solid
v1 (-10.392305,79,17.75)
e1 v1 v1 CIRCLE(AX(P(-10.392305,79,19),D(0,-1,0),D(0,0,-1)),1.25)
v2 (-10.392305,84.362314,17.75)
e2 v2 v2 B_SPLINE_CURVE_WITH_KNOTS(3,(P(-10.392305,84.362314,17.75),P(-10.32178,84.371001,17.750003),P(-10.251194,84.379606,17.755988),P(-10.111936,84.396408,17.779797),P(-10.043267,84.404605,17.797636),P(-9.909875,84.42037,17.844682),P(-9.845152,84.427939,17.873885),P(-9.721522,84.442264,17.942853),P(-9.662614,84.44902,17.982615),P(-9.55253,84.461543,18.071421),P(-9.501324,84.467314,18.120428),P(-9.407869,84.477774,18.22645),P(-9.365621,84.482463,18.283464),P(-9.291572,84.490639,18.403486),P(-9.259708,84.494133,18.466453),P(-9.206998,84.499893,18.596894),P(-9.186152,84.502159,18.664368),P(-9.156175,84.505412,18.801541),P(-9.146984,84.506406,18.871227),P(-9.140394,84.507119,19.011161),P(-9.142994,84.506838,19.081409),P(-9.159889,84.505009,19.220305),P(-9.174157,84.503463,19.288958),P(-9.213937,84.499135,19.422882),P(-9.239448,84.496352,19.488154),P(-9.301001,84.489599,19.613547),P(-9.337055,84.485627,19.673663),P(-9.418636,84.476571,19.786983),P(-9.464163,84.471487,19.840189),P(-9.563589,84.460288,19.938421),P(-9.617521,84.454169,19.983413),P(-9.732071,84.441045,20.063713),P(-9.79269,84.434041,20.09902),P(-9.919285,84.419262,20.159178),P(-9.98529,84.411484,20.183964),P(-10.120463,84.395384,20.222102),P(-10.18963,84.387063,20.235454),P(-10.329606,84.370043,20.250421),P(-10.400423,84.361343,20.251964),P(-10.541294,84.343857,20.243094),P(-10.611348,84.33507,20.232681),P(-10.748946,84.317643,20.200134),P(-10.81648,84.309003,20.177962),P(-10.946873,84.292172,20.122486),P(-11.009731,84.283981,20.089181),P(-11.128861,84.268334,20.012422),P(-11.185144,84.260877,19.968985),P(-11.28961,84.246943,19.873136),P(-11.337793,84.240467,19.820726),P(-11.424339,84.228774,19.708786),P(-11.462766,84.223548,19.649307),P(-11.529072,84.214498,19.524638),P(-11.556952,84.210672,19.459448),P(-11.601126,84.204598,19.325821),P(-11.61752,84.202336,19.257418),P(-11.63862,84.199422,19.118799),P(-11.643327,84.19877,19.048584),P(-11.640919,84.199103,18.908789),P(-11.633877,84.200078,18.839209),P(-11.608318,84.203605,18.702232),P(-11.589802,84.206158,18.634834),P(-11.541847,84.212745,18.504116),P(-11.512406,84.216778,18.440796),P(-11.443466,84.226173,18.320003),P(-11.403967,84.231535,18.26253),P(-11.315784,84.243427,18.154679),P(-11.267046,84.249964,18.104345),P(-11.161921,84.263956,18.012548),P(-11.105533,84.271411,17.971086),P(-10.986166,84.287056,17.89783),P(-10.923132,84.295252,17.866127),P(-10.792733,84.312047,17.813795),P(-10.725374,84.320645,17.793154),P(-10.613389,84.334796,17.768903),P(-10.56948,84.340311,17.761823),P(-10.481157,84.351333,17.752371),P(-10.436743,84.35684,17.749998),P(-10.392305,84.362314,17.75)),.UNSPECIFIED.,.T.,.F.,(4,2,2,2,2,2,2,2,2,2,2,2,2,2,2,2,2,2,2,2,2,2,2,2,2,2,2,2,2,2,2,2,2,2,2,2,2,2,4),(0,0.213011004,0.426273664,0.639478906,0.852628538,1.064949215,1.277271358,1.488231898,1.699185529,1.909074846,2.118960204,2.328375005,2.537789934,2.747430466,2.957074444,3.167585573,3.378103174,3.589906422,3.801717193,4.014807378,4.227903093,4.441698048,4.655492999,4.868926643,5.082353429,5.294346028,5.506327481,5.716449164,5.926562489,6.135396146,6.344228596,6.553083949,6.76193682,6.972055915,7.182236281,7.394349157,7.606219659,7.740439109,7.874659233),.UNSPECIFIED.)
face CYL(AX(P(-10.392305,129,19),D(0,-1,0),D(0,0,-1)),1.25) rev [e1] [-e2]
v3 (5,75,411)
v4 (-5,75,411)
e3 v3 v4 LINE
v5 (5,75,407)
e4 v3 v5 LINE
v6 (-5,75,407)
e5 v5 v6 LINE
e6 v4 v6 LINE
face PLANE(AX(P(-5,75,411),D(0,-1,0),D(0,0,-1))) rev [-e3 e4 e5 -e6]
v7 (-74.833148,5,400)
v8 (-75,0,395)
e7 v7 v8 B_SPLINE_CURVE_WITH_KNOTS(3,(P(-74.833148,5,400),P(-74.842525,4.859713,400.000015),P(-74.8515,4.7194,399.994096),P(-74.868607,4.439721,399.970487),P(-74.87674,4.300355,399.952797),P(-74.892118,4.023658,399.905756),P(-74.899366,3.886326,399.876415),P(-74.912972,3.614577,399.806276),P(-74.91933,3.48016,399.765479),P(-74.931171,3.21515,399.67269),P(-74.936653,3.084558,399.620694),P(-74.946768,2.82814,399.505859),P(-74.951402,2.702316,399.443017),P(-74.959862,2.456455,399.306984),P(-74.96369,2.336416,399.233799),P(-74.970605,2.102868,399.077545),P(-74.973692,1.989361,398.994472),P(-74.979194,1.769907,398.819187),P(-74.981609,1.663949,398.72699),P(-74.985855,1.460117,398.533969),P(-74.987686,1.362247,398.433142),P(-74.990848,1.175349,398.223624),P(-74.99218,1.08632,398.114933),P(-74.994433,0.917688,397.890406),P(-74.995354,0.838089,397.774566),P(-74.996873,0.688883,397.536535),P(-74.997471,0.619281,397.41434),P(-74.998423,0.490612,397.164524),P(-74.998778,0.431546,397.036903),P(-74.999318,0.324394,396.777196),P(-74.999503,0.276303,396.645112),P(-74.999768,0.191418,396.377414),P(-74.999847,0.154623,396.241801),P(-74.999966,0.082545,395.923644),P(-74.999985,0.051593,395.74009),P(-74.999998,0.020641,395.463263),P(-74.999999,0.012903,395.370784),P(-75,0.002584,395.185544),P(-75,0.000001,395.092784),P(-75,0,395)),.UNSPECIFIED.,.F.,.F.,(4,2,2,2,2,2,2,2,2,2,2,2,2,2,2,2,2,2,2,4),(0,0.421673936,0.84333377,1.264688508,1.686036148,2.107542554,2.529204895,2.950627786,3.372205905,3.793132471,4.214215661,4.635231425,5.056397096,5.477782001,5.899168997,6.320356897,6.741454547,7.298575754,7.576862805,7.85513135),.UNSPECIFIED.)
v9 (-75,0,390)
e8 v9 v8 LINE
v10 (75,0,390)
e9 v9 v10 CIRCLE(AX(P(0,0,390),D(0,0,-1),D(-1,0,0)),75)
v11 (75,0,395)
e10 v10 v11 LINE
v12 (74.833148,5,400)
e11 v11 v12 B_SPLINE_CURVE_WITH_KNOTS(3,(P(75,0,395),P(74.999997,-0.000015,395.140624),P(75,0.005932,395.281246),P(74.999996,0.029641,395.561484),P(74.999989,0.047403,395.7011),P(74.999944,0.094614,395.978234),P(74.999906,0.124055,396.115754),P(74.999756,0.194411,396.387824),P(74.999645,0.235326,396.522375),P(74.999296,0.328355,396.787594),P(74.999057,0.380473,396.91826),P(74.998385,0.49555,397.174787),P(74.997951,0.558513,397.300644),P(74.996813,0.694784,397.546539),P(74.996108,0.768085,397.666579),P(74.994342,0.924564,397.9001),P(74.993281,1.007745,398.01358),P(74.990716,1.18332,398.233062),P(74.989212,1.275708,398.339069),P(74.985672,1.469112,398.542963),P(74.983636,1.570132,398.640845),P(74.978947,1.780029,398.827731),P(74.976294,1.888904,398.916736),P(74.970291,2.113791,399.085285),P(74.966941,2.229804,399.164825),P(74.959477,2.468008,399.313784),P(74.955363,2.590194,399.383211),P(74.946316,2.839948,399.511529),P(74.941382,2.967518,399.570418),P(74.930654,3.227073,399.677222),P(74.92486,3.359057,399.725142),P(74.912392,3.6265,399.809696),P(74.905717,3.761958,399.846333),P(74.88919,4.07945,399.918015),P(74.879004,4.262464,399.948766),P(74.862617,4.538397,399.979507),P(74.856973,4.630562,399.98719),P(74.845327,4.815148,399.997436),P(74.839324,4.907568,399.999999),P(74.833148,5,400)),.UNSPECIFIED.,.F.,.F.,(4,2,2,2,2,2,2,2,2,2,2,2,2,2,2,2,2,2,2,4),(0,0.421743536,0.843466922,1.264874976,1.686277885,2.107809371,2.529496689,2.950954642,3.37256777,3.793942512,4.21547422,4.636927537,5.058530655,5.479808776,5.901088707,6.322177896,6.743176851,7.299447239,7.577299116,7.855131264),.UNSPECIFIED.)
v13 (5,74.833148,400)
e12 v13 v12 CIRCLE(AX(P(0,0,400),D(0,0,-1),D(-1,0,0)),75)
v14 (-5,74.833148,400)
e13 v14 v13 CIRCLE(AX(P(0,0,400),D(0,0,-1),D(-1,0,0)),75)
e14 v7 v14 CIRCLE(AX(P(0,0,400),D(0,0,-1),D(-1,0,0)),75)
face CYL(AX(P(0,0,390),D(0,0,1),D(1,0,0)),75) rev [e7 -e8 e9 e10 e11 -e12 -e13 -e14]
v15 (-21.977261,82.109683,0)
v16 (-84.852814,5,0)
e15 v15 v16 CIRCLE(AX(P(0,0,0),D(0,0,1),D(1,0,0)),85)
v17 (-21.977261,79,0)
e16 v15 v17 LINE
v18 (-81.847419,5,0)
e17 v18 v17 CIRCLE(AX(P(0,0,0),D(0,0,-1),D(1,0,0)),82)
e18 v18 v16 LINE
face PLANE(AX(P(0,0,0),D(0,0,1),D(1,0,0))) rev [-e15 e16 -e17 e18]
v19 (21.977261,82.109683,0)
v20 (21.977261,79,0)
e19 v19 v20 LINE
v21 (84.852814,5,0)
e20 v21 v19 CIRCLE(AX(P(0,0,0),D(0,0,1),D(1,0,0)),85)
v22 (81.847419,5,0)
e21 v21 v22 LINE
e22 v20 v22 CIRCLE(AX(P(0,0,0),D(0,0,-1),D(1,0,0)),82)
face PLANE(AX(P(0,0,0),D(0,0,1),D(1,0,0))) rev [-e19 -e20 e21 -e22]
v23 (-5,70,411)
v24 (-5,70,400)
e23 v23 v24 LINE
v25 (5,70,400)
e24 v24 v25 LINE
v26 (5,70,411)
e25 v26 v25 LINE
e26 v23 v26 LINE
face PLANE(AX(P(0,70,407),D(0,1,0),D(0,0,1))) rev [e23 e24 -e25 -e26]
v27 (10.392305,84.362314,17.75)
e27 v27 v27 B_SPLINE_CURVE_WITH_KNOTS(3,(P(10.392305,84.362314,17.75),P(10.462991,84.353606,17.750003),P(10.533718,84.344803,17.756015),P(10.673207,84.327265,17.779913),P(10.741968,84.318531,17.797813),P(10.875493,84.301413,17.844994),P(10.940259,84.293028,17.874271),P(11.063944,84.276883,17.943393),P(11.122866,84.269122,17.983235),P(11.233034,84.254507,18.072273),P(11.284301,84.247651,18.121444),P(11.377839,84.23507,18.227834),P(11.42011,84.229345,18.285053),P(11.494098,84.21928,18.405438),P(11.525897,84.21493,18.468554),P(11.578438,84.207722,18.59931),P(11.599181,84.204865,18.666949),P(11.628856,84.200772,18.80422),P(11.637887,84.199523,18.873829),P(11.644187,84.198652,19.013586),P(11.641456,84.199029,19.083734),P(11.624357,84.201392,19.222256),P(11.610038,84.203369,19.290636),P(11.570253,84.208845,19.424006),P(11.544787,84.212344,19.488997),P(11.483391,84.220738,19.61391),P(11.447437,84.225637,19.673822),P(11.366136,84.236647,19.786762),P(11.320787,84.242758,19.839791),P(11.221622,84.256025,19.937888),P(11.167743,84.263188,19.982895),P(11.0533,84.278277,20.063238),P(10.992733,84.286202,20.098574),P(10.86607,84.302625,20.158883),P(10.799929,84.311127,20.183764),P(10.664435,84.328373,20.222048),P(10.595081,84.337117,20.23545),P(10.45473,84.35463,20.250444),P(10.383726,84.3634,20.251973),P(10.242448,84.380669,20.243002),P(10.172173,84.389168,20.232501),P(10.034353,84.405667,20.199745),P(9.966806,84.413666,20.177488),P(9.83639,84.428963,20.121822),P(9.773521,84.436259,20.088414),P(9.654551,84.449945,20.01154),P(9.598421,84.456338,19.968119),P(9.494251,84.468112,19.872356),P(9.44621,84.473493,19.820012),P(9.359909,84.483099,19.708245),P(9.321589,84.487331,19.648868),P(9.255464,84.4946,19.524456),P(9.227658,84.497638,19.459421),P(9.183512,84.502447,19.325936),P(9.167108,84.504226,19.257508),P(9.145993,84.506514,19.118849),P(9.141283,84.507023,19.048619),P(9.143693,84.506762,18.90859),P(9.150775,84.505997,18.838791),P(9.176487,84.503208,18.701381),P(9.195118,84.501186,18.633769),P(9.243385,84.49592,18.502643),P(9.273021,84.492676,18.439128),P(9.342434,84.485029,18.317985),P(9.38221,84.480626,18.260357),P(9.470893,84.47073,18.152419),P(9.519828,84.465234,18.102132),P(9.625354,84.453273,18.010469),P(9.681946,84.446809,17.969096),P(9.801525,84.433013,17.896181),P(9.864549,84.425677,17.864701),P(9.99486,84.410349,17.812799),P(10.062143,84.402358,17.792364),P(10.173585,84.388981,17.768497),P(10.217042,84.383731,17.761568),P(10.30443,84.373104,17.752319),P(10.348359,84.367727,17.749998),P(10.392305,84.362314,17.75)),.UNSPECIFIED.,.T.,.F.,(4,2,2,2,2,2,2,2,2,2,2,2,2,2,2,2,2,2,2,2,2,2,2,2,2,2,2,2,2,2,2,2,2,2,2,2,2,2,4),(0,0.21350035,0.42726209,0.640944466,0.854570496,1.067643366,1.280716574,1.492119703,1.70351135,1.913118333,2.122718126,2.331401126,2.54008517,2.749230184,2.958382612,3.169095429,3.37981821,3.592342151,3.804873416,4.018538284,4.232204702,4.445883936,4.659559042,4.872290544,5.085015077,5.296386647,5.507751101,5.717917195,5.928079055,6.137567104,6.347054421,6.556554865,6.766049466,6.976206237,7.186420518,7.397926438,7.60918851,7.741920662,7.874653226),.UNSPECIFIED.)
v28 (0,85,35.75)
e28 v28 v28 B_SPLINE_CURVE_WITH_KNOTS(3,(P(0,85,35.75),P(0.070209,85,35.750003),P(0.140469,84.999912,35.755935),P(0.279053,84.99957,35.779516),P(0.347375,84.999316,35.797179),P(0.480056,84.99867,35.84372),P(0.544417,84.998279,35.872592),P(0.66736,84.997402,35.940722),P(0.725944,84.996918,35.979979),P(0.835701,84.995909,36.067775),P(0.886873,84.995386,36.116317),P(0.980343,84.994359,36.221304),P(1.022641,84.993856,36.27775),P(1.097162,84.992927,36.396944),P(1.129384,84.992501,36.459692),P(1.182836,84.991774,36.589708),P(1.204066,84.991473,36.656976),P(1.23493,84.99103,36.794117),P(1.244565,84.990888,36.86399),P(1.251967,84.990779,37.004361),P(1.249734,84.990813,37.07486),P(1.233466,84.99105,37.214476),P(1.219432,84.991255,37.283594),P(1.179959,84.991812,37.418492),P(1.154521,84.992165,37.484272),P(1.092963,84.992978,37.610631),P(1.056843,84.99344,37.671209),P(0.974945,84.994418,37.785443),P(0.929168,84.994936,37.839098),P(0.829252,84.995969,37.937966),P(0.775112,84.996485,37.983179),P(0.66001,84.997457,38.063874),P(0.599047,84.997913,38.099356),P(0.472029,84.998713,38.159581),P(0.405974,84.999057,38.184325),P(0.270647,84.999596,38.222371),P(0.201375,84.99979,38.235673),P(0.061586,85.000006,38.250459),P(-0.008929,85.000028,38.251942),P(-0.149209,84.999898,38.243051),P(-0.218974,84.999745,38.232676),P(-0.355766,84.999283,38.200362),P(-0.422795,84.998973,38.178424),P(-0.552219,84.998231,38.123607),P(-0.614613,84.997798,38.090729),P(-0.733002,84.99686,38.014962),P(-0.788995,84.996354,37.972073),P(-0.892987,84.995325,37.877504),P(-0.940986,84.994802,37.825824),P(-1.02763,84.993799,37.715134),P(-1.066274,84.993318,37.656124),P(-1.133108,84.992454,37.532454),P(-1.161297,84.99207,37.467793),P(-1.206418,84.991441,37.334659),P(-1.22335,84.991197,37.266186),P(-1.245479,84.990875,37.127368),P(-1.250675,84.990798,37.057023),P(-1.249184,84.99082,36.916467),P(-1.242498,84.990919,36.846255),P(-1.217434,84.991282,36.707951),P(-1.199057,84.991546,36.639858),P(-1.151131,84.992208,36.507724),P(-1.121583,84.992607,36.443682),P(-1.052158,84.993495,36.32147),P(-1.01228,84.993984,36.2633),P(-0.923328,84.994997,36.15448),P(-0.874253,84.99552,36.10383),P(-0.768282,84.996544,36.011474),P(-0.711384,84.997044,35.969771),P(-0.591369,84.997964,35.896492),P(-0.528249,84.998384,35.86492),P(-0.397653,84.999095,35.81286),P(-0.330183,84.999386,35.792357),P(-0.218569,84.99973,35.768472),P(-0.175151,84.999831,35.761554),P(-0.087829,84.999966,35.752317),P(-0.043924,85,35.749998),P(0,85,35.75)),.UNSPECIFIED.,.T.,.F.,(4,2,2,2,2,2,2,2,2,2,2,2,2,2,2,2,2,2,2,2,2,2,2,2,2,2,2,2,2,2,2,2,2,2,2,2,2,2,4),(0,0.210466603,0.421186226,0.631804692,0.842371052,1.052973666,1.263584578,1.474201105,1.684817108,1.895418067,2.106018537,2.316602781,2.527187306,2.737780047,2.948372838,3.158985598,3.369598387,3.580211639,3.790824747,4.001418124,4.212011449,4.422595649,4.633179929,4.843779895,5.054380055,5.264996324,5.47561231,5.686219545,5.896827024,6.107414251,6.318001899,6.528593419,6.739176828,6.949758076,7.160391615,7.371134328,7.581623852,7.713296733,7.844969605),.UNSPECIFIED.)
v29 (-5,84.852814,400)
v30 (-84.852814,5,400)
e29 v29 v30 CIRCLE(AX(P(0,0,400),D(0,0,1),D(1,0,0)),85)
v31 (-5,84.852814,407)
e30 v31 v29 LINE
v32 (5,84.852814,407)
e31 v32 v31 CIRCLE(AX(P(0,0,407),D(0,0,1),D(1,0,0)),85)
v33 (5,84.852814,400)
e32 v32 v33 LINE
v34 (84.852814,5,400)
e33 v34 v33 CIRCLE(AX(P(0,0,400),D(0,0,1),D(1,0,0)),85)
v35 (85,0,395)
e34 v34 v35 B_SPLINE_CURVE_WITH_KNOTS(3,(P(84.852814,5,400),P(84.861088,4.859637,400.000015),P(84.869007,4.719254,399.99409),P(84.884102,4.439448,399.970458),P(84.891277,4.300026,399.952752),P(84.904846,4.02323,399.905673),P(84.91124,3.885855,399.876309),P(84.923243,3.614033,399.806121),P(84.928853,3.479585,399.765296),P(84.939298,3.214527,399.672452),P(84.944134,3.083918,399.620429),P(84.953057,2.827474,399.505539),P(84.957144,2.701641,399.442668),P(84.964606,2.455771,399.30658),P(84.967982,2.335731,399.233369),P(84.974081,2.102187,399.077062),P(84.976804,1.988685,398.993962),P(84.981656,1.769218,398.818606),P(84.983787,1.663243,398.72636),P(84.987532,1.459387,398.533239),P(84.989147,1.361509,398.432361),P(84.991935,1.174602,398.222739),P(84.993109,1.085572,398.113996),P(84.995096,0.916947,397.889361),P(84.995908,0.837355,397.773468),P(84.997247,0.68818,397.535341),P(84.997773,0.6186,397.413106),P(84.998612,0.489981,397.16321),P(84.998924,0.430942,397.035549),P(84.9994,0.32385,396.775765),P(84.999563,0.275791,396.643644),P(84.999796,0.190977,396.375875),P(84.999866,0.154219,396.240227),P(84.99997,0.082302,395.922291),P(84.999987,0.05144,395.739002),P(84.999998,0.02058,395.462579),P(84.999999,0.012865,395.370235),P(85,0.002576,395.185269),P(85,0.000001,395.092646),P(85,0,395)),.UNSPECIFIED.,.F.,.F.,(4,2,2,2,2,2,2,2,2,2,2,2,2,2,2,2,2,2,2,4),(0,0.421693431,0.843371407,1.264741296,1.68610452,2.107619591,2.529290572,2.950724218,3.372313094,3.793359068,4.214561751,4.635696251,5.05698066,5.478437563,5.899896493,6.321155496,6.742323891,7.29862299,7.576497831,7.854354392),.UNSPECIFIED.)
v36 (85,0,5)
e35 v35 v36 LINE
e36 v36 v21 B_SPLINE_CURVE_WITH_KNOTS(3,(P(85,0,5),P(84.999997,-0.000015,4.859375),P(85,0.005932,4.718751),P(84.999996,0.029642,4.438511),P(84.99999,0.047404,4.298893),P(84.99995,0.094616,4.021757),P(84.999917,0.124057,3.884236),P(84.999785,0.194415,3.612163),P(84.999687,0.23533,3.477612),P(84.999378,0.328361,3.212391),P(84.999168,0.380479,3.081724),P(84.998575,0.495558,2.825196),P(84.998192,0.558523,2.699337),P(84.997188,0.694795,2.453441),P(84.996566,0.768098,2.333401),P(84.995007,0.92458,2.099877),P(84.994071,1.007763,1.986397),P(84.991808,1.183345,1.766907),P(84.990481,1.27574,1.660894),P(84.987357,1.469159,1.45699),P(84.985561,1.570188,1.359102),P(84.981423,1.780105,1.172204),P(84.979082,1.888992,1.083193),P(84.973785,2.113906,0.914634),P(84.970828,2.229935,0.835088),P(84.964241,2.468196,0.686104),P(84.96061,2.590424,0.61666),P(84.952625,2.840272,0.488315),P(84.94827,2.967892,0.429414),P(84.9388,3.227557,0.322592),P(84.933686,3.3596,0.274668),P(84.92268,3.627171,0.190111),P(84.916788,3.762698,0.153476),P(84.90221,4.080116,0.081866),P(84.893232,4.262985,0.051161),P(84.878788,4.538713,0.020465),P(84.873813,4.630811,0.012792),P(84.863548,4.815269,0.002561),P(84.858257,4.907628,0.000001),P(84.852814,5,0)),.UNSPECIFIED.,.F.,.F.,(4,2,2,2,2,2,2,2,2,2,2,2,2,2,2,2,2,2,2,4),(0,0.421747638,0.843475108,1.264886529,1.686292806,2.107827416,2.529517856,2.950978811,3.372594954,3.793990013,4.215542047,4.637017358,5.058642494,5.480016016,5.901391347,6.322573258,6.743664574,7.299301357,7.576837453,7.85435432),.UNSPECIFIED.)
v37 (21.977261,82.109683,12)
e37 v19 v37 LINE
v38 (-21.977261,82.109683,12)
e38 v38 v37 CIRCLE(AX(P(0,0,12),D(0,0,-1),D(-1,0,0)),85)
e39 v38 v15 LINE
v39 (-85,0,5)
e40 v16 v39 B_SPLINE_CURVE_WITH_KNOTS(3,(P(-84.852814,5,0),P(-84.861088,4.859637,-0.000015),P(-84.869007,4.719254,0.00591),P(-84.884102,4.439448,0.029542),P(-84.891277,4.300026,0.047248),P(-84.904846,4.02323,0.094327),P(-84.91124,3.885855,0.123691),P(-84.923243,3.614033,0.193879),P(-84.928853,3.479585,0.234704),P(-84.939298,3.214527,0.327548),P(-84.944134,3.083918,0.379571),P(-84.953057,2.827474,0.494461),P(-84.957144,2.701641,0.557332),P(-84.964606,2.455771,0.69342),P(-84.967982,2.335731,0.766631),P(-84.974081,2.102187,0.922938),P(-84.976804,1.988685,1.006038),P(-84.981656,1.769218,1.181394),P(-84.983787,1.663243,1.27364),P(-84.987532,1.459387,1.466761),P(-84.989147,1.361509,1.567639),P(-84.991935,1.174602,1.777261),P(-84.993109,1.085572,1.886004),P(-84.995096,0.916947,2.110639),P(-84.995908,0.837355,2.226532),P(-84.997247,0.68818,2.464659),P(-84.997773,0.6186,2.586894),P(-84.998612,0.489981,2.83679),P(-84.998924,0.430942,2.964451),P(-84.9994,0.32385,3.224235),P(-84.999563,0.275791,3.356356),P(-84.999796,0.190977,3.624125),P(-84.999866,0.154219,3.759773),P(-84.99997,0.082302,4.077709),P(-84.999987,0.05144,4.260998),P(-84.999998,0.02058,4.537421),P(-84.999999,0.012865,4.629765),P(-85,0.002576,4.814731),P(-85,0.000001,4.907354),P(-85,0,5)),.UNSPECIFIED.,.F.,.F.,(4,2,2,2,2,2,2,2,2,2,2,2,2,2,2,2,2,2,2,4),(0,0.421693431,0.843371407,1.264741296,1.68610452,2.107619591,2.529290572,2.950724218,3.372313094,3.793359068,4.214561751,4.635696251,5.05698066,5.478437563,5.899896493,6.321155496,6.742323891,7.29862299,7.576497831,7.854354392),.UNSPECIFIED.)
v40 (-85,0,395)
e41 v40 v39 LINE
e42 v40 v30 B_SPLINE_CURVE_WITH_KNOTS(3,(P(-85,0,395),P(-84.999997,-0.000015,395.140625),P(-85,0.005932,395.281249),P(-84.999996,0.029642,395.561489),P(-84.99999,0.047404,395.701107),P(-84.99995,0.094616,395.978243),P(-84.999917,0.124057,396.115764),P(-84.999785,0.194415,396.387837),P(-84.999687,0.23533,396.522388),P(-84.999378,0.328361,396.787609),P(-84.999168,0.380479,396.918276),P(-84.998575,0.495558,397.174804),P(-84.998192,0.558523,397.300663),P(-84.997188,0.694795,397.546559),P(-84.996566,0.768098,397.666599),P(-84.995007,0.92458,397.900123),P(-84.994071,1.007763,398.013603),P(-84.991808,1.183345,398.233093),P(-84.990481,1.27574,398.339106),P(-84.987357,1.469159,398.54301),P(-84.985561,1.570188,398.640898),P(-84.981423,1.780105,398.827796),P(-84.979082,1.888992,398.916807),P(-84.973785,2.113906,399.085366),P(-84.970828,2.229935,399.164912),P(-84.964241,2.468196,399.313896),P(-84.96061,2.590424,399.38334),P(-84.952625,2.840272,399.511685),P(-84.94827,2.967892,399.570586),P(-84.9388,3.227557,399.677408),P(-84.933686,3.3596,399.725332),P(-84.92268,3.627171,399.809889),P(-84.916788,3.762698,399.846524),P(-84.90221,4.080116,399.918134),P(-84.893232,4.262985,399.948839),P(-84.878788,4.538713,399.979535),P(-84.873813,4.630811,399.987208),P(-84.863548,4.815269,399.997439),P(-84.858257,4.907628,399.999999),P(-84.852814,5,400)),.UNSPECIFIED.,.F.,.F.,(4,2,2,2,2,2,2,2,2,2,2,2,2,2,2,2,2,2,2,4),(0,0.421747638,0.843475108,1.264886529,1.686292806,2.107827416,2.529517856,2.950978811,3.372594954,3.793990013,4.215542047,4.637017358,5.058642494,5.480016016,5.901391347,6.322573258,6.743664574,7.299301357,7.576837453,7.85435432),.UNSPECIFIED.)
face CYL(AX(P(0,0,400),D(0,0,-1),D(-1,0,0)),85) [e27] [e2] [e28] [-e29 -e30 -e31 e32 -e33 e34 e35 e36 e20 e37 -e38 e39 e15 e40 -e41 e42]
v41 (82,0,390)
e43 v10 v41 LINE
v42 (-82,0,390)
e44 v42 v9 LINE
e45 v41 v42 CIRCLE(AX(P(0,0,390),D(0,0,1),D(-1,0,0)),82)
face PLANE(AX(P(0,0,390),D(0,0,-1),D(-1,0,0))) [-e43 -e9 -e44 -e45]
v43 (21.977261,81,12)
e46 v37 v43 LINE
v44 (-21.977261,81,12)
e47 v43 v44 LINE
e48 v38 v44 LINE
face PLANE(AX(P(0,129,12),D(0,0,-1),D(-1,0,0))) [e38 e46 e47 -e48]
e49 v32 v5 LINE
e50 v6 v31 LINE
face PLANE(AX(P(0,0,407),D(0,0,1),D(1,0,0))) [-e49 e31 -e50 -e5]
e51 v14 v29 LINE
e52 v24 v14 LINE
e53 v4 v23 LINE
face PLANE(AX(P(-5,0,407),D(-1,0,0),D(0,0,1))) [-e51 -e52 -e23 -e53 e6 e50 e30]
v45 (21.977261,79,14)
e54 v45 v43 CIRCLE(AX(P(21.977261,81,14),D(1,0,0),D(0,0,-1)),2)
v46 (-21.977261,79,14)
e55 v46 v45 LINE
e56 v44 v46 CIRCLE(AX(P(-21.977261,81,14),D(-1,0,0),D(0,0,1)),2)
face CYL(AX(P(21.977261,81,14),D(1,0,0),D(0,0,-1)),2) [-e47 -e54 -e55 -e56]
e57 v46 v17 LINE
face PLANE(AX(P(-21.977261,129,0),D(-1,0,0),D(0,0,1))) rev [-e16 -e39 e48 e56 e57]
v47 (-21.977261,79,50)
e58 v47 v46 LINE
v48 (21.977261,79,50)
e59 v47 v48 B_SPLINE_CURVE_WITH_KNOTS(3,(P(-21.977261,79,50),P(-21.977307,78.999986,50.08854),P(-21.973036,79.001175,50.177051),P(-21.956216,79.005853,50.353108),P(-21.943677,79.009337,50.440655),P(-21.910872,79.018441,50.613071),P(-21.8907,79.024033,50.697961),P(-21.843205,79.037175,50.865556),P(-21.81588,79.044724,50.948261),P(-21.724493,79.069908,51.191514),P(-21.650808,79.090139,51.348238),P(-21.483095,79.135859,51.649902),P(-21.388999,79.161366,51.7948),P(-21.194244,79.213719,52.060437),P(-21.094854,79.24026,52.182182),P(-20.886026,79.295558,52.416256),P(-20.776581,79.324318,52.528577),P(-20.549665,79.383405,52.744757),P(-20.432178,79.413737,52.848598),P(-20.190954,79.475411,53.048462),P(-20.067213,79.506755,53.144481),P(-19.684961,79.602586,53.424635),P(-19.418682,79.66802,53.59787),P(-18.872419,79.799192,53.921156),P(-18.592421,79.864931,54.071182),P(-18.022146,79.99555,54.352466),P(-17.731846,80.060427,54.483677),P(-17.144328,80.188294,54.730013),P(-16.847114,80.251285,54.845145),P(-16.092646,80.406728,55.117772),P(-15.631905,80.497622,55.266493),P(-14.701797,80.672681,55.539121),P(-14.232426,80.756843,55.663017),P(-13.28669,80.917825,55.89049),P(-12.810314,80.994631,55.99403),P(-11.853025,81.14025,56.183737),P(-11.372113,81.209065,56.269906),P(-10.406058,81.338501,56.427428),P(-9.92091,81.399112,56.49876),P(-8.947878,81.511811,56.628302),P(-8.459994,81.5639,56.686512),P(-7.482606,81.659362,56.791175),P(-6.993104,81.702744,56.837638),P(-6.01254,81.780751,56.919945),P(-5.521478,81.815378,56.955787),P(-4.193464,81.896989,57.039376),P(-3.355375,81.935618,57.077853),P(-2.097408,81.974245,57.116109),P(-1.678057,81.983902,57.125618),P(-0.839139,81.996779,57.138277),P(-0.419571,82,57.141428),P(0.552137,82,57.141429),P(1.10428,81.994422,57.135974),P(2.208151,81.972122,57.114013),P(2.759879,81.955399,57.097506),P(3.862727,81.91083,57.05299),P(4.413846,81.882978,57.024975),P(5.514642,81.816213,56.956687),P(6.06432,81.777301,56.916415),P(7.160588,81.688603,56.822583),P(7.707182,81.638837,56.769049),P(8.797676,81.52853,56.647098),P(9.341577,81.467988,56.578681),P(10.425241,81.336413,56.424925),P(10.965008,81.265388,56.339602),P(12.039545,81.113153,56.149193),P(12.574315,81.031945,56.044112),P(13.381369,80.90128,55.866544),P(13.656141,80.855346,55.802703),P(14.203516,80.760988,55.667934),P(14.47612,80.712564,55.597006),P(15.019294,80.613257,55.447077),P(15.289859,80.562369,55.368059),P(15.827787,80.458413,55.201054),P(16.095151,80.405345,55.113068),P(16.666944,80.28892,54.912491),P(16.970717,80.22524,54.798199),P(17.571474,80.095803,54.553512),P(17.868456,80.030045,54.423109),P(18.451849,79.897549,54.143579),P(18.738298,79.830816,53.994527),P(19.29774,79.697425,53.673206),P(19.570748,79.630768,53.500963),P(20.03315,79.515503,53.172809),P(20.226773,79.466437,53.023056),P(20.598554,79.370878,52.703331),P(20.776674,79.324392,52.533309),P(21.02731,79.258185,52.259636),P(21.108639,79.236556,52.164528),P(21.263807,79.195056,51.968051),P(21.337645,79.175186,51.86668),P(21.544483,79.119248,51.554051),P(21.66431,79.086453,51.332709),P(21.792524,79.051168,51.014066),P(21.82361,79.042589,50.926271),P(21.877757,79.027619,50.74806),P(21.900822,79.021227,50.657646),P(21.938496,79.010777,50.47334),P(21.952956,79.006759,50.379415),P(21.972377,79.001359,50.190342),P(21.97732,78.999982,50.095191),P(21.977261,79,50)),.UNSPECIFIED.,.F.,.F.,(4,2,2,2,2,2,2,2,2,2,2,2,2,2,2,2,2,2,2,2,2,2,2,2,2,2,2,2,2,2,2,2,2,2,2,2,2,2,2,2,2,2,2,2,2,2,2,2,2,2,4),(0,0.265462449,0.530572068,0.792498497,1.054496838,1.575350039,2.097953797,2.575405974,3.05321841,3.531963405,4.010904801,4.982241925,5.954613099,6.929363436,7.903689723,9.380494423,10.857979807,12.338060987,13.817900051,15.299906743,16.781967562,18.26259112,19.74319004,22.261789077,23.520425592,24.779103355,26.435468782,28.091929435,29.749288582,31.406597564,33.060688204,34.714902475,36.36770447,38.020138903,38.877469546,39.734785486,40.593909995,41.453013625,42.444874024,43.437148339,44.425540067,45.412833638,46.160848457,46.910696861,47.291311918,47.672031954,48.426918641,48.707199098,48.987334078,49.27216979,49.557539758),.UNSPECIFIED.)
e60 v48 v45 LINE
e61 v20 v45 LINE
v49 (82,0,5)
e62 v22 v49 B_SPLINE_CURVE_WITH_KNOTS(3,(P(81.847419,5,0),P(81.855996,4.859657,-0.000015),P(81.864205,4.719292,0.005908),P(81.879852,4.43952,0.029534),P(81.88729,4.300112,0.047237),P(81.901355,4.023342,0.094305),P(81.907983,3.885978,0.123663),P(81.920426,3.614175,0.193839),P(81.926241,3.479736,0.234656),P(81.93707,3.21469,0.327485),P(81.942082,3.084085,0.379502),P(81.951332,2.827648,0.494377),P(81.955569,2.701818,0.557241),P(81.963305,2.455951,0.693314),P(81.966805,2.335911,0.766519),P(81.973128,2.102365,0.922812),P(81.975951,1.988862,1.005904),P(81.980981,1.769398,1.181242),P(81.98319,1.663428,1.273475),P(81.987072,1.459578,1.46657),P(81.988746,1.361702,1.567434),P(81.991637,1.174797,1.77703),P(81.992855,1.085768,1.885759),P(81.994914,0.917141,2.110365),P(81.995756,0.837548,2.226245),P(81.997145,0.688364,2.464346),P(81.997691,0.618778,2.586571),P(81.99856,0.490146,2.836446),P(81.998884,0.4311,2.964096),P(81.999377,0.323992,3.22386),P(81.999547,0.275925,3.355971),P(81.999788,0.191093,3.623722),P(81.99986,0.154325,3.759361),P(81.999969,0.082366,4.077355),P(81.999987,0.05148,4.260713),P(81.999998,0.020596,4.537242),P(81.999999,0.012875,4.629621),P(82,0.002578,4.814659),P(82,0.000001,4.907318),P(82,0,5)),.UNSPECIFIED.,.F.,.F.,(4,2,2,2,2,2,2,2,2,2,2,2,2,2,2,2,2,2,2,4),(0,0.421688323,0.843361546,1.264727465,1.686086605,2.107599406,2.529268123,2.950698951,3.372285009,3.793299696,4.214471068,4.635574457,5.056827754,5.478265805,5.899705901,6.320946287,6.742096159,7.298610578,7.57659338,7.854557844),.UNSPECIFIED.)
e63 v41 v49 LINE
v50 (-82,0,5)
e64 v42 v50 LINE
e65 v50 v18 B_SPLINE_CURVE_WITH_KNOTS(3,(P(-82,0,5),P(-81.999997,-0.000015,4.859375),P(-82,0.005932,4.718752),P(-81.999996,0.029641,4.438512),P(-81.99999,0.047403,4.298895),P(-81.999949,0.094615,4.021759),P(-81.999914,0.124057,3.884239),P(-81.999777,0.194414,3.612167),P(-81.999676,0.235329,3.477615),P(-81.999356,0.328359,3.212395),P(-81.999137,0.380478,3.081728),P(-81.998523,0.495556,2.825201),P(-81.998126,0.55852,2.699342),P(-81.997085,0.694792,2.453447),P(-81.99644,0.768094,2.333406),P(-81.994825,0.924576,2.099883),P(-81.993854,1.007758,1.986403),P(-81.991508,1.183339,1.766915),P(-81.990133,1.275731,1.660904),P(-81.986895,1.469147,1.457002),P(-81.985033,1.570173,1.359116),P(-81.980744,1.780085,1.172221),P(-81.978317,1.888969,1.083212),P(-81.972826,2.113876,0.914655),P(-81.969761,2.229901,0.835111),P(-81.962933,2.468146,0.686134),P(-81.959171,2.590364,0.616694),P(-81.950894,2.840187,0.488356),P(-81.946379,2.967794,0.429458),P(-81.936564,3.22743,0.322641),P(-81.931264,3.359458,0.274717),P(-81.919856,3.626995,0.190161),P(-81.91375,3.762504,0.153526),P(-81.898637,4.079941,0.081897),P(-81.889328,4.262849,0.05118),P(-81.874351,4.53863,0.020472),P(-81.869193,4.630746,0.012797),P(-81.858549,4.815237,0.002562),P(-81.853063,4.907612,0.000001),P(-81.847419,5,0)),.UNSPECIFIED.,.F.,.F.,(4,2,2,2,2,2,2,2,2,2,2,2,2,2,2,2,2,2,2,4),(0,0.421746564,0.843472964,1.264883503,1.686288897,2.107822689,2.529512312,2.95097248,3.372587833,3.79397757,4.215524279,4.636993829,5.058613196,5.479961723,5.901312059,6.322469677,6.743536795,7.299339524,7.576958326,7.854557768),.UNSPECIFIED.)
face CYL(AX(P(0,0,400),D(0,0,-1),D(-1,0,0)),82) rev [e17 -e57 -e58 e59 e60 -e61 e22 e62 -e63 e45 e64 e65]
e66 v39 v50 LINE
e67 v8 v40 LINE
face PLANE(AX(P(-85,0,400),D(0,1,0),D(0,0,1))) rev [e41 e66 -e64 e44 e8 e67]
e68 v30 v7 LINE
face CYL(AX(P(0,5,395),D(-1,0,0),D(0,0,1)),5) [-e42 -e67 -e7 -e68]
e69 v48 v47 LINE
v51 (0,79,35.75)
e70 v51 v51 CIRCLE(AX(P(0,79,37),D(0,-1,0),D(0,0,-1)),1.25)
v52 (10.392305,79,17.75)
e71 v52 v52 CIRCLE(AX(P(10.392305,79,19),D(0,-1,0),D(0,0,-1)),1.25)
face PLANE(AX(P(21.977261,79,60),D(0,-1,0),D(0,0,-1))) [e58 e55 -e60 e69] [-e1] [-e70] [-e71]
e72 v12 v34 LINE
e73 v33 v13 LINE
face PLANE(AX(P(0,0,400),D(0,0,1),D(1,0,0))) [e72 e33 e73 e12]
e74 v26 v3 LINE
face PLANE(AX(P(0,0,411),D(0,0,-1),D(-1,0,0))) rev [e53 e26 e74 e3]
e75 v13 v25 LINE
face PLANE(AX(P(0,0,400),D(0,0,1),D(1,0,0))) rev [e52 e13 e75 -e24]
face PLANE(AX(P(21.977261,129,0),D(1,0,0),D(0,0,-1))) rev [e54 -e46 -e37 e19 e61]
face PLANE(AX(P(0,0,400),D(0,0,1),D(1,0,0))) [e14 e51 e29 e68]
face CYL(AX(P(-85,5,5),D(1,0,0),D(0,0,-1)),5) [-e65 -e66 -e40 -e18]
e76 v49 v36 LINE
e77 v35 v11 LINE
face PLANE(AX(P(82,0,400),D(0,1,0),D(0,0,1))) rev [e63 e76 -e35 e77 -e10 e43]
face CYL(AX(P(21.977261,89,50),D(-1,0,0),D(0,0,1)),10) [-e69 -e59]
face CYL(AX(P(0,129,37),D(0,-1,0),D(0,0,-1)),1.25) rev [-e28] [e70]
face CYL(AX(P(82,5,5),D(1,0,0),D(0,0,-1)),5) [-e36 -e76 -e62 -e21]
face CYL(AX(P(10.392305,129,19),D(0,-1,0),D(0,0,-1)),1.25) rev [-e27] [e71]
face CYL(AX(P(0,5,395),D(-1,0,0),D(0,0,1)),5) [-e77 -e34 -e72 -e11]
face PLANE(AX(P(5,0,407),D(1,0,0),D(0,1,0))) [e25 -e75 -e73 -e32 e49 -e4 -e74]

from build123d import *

# Parameters (mm, degrees)
BOSS_EXTRUDE1_DEPTH = 400
BOSS_EXTRUDE3_DEPTH = 60
FILLET4_R           = 10
SKETCH6_R           = 1.25
SKETCH6_W           = 43.954521952
SKETCH6_H           = 12
CUT_EXTRUDE5_DEPTH  = 50
BOSS_EXTRUDE4_START = -10
BOSS_EXTRUDE4_DEPTH = 10
BOSS_EXTRUDE5_DEPTH = 7
SKETCH10_W          = 10
SKETCH10_H          = 5
BOSS_EXTRUDE6_DEPTH = 4
FILLET6_R           = 5
FILLET7_R           = 2


with BuildPart() as part:
    # Sketch1 → Boss-Extrude1 (new body)
    with BuildSketch(Plane.XY):
        with BuildLine():
            Line((-85, 0), (-82, 0))
            ThreePointArc((-82, 0), (0, 82), (82, 0))
            Line((82, 0), (85, 0))
            ThreePointArc((85, 0), (0, 85), (-85, 0))
        make_face()
    extrude(amount=BOSS_EXTRUDE1_DEPTH)

    # Sketch5 → Boss-Extrude3 (add)
    with BuildSketch(Plane(origin=(0, 0, 0), x_dir=(-1, 0, 0), z_dir=(0, 0, -1))):
        with BuildLine():
            Line((-21.977260976, 79), (21.977260976, 79))
            ThreePointArc((21.977260976, 79), (0, 82), (-21.977260976, 79))
        make_face()
    extrude(amount=-BOSS_EXTRUDE3_DEPTH)

    # Fillet4
    # the kernel refuses this fillet: 10 mm, written as the material it takes off along each edge
    with BuildSketch(Plane(origin=(46.977260976, 79, 60), x_dir=(0, 0, -1), z_dir=(-1, 0, 0))) as fillet4_piece_1_section:
        with BuildLine():
            CenterArc((FILLET4_R, -FILLET4_R), FILLET4_R, 90, 90)
            Line((0, -FILLET4_R), (0, 0))
            Line((0, 0), (FILLET4_R, 0))
        make_face()
    fillet4_piece_1 = extrude(amount=93.954521952, mode=Mode.PRIVATE)
    fillet4_piece_1 = fillet4_piece_1 & Plane(origin=(0, 0, 56.767461198), x_dir=(-1, 0, 0), z_dir=(0, 0, -1)) * Cylinder(82, 228, mode=Mode.PRIVATE)
    add(fillet4_piece_1, mode=Mode.SUBTRACT)

    # Sketch6 → Cut-Extrude5 (cut)
    with BuildSketch(Plane.XZ.offset(-79)):
        with Locations(Location((0, 37, 0), (0, 0, 270))):
            Circle(SKETCH6_R)
        with Locations(Location((10.392304845, 19, 0), (0, 0, 270))):
            Circle(SKETCH6_R)
        with Locations(Location((-10.392304845, 19, 0), (0, 0, 270))):
            Circle(SKETCH6_R)
        with Locations((0, 6)):
            Rectangle(SKETCH6_W, SKETCH6_H)
    extrude(amount=-CUT_EXTRUDE5_DEPTH, mode=Mode.SUBTRACT)

    # Sketch7 → Boss-Extrude4 (add)
    with BuildSketch(Plane.XY.offset(400).offset(BOSS_EXTRUDE4_START)):
        with BuildLine():
            Line((-75, 0), (-82, 0))
            ThreePointArc((-82, 0), (0, 82), (82, 0))
            Line((82, 0), (75, 0))
            ThreePointArc((75, 0), (0, 75), (-75, 0))
        make_face()
    extrude(amount=BOSS_EXTRUDE4_DEPTH)

    # Sketch9 → Boss-Extrude5 (add)
    with BuildSketch(Plane.XY.offset(400)):
        with BuildLine():
            Line((-5, 84.852813742), (-5, 80))
            Line((-5, 80), (-5, 74.833147735))
            Line((-5, 74.833147735), (-5, 70))
            Line((-5, 70), (5, 70))
            Line((5, 70), (5, 74.833147735))
            Line((5, 74.833147735), (5, 80))
            Line((5, 80), (5, 84.852813742))
            ThreePointArc((5, 84.852813742), (0, 85), (-5, 84.852813742))
        make_face()
    extrude(amount=BOSS_EXTRUDE5_DEPTH)

    # Sketch10 → Boss-Extrude6 (add)
    with BuildSketch(Plane.XY.offset(407)):
        with Locations((0, 72.5)):
            Rectangle(SKETCH10_W, SKETCH10_H)
    extrude(amount=BOSS_EXTRUDE6_DEPTH)

    # Fillet6
    fillet6_edges = [part.edges().sort_by_distance(p)[0] for p in [
        (80, 0, 400),
        (83.5, 0, 0),
        (-83.5, 0, 0),
        (-80, 0, 400),
    ]]
    fillet(fillet6_edges, radius=FILLET6_R)

    # Fillet7
    fillet7_edges = [part.edges().sort_by_distance(p)[0] for p in [
        (0, 79, 12),
    ]]
    fillet(fillet7_edges, radius=FILLET7_R)


solid = part.part
